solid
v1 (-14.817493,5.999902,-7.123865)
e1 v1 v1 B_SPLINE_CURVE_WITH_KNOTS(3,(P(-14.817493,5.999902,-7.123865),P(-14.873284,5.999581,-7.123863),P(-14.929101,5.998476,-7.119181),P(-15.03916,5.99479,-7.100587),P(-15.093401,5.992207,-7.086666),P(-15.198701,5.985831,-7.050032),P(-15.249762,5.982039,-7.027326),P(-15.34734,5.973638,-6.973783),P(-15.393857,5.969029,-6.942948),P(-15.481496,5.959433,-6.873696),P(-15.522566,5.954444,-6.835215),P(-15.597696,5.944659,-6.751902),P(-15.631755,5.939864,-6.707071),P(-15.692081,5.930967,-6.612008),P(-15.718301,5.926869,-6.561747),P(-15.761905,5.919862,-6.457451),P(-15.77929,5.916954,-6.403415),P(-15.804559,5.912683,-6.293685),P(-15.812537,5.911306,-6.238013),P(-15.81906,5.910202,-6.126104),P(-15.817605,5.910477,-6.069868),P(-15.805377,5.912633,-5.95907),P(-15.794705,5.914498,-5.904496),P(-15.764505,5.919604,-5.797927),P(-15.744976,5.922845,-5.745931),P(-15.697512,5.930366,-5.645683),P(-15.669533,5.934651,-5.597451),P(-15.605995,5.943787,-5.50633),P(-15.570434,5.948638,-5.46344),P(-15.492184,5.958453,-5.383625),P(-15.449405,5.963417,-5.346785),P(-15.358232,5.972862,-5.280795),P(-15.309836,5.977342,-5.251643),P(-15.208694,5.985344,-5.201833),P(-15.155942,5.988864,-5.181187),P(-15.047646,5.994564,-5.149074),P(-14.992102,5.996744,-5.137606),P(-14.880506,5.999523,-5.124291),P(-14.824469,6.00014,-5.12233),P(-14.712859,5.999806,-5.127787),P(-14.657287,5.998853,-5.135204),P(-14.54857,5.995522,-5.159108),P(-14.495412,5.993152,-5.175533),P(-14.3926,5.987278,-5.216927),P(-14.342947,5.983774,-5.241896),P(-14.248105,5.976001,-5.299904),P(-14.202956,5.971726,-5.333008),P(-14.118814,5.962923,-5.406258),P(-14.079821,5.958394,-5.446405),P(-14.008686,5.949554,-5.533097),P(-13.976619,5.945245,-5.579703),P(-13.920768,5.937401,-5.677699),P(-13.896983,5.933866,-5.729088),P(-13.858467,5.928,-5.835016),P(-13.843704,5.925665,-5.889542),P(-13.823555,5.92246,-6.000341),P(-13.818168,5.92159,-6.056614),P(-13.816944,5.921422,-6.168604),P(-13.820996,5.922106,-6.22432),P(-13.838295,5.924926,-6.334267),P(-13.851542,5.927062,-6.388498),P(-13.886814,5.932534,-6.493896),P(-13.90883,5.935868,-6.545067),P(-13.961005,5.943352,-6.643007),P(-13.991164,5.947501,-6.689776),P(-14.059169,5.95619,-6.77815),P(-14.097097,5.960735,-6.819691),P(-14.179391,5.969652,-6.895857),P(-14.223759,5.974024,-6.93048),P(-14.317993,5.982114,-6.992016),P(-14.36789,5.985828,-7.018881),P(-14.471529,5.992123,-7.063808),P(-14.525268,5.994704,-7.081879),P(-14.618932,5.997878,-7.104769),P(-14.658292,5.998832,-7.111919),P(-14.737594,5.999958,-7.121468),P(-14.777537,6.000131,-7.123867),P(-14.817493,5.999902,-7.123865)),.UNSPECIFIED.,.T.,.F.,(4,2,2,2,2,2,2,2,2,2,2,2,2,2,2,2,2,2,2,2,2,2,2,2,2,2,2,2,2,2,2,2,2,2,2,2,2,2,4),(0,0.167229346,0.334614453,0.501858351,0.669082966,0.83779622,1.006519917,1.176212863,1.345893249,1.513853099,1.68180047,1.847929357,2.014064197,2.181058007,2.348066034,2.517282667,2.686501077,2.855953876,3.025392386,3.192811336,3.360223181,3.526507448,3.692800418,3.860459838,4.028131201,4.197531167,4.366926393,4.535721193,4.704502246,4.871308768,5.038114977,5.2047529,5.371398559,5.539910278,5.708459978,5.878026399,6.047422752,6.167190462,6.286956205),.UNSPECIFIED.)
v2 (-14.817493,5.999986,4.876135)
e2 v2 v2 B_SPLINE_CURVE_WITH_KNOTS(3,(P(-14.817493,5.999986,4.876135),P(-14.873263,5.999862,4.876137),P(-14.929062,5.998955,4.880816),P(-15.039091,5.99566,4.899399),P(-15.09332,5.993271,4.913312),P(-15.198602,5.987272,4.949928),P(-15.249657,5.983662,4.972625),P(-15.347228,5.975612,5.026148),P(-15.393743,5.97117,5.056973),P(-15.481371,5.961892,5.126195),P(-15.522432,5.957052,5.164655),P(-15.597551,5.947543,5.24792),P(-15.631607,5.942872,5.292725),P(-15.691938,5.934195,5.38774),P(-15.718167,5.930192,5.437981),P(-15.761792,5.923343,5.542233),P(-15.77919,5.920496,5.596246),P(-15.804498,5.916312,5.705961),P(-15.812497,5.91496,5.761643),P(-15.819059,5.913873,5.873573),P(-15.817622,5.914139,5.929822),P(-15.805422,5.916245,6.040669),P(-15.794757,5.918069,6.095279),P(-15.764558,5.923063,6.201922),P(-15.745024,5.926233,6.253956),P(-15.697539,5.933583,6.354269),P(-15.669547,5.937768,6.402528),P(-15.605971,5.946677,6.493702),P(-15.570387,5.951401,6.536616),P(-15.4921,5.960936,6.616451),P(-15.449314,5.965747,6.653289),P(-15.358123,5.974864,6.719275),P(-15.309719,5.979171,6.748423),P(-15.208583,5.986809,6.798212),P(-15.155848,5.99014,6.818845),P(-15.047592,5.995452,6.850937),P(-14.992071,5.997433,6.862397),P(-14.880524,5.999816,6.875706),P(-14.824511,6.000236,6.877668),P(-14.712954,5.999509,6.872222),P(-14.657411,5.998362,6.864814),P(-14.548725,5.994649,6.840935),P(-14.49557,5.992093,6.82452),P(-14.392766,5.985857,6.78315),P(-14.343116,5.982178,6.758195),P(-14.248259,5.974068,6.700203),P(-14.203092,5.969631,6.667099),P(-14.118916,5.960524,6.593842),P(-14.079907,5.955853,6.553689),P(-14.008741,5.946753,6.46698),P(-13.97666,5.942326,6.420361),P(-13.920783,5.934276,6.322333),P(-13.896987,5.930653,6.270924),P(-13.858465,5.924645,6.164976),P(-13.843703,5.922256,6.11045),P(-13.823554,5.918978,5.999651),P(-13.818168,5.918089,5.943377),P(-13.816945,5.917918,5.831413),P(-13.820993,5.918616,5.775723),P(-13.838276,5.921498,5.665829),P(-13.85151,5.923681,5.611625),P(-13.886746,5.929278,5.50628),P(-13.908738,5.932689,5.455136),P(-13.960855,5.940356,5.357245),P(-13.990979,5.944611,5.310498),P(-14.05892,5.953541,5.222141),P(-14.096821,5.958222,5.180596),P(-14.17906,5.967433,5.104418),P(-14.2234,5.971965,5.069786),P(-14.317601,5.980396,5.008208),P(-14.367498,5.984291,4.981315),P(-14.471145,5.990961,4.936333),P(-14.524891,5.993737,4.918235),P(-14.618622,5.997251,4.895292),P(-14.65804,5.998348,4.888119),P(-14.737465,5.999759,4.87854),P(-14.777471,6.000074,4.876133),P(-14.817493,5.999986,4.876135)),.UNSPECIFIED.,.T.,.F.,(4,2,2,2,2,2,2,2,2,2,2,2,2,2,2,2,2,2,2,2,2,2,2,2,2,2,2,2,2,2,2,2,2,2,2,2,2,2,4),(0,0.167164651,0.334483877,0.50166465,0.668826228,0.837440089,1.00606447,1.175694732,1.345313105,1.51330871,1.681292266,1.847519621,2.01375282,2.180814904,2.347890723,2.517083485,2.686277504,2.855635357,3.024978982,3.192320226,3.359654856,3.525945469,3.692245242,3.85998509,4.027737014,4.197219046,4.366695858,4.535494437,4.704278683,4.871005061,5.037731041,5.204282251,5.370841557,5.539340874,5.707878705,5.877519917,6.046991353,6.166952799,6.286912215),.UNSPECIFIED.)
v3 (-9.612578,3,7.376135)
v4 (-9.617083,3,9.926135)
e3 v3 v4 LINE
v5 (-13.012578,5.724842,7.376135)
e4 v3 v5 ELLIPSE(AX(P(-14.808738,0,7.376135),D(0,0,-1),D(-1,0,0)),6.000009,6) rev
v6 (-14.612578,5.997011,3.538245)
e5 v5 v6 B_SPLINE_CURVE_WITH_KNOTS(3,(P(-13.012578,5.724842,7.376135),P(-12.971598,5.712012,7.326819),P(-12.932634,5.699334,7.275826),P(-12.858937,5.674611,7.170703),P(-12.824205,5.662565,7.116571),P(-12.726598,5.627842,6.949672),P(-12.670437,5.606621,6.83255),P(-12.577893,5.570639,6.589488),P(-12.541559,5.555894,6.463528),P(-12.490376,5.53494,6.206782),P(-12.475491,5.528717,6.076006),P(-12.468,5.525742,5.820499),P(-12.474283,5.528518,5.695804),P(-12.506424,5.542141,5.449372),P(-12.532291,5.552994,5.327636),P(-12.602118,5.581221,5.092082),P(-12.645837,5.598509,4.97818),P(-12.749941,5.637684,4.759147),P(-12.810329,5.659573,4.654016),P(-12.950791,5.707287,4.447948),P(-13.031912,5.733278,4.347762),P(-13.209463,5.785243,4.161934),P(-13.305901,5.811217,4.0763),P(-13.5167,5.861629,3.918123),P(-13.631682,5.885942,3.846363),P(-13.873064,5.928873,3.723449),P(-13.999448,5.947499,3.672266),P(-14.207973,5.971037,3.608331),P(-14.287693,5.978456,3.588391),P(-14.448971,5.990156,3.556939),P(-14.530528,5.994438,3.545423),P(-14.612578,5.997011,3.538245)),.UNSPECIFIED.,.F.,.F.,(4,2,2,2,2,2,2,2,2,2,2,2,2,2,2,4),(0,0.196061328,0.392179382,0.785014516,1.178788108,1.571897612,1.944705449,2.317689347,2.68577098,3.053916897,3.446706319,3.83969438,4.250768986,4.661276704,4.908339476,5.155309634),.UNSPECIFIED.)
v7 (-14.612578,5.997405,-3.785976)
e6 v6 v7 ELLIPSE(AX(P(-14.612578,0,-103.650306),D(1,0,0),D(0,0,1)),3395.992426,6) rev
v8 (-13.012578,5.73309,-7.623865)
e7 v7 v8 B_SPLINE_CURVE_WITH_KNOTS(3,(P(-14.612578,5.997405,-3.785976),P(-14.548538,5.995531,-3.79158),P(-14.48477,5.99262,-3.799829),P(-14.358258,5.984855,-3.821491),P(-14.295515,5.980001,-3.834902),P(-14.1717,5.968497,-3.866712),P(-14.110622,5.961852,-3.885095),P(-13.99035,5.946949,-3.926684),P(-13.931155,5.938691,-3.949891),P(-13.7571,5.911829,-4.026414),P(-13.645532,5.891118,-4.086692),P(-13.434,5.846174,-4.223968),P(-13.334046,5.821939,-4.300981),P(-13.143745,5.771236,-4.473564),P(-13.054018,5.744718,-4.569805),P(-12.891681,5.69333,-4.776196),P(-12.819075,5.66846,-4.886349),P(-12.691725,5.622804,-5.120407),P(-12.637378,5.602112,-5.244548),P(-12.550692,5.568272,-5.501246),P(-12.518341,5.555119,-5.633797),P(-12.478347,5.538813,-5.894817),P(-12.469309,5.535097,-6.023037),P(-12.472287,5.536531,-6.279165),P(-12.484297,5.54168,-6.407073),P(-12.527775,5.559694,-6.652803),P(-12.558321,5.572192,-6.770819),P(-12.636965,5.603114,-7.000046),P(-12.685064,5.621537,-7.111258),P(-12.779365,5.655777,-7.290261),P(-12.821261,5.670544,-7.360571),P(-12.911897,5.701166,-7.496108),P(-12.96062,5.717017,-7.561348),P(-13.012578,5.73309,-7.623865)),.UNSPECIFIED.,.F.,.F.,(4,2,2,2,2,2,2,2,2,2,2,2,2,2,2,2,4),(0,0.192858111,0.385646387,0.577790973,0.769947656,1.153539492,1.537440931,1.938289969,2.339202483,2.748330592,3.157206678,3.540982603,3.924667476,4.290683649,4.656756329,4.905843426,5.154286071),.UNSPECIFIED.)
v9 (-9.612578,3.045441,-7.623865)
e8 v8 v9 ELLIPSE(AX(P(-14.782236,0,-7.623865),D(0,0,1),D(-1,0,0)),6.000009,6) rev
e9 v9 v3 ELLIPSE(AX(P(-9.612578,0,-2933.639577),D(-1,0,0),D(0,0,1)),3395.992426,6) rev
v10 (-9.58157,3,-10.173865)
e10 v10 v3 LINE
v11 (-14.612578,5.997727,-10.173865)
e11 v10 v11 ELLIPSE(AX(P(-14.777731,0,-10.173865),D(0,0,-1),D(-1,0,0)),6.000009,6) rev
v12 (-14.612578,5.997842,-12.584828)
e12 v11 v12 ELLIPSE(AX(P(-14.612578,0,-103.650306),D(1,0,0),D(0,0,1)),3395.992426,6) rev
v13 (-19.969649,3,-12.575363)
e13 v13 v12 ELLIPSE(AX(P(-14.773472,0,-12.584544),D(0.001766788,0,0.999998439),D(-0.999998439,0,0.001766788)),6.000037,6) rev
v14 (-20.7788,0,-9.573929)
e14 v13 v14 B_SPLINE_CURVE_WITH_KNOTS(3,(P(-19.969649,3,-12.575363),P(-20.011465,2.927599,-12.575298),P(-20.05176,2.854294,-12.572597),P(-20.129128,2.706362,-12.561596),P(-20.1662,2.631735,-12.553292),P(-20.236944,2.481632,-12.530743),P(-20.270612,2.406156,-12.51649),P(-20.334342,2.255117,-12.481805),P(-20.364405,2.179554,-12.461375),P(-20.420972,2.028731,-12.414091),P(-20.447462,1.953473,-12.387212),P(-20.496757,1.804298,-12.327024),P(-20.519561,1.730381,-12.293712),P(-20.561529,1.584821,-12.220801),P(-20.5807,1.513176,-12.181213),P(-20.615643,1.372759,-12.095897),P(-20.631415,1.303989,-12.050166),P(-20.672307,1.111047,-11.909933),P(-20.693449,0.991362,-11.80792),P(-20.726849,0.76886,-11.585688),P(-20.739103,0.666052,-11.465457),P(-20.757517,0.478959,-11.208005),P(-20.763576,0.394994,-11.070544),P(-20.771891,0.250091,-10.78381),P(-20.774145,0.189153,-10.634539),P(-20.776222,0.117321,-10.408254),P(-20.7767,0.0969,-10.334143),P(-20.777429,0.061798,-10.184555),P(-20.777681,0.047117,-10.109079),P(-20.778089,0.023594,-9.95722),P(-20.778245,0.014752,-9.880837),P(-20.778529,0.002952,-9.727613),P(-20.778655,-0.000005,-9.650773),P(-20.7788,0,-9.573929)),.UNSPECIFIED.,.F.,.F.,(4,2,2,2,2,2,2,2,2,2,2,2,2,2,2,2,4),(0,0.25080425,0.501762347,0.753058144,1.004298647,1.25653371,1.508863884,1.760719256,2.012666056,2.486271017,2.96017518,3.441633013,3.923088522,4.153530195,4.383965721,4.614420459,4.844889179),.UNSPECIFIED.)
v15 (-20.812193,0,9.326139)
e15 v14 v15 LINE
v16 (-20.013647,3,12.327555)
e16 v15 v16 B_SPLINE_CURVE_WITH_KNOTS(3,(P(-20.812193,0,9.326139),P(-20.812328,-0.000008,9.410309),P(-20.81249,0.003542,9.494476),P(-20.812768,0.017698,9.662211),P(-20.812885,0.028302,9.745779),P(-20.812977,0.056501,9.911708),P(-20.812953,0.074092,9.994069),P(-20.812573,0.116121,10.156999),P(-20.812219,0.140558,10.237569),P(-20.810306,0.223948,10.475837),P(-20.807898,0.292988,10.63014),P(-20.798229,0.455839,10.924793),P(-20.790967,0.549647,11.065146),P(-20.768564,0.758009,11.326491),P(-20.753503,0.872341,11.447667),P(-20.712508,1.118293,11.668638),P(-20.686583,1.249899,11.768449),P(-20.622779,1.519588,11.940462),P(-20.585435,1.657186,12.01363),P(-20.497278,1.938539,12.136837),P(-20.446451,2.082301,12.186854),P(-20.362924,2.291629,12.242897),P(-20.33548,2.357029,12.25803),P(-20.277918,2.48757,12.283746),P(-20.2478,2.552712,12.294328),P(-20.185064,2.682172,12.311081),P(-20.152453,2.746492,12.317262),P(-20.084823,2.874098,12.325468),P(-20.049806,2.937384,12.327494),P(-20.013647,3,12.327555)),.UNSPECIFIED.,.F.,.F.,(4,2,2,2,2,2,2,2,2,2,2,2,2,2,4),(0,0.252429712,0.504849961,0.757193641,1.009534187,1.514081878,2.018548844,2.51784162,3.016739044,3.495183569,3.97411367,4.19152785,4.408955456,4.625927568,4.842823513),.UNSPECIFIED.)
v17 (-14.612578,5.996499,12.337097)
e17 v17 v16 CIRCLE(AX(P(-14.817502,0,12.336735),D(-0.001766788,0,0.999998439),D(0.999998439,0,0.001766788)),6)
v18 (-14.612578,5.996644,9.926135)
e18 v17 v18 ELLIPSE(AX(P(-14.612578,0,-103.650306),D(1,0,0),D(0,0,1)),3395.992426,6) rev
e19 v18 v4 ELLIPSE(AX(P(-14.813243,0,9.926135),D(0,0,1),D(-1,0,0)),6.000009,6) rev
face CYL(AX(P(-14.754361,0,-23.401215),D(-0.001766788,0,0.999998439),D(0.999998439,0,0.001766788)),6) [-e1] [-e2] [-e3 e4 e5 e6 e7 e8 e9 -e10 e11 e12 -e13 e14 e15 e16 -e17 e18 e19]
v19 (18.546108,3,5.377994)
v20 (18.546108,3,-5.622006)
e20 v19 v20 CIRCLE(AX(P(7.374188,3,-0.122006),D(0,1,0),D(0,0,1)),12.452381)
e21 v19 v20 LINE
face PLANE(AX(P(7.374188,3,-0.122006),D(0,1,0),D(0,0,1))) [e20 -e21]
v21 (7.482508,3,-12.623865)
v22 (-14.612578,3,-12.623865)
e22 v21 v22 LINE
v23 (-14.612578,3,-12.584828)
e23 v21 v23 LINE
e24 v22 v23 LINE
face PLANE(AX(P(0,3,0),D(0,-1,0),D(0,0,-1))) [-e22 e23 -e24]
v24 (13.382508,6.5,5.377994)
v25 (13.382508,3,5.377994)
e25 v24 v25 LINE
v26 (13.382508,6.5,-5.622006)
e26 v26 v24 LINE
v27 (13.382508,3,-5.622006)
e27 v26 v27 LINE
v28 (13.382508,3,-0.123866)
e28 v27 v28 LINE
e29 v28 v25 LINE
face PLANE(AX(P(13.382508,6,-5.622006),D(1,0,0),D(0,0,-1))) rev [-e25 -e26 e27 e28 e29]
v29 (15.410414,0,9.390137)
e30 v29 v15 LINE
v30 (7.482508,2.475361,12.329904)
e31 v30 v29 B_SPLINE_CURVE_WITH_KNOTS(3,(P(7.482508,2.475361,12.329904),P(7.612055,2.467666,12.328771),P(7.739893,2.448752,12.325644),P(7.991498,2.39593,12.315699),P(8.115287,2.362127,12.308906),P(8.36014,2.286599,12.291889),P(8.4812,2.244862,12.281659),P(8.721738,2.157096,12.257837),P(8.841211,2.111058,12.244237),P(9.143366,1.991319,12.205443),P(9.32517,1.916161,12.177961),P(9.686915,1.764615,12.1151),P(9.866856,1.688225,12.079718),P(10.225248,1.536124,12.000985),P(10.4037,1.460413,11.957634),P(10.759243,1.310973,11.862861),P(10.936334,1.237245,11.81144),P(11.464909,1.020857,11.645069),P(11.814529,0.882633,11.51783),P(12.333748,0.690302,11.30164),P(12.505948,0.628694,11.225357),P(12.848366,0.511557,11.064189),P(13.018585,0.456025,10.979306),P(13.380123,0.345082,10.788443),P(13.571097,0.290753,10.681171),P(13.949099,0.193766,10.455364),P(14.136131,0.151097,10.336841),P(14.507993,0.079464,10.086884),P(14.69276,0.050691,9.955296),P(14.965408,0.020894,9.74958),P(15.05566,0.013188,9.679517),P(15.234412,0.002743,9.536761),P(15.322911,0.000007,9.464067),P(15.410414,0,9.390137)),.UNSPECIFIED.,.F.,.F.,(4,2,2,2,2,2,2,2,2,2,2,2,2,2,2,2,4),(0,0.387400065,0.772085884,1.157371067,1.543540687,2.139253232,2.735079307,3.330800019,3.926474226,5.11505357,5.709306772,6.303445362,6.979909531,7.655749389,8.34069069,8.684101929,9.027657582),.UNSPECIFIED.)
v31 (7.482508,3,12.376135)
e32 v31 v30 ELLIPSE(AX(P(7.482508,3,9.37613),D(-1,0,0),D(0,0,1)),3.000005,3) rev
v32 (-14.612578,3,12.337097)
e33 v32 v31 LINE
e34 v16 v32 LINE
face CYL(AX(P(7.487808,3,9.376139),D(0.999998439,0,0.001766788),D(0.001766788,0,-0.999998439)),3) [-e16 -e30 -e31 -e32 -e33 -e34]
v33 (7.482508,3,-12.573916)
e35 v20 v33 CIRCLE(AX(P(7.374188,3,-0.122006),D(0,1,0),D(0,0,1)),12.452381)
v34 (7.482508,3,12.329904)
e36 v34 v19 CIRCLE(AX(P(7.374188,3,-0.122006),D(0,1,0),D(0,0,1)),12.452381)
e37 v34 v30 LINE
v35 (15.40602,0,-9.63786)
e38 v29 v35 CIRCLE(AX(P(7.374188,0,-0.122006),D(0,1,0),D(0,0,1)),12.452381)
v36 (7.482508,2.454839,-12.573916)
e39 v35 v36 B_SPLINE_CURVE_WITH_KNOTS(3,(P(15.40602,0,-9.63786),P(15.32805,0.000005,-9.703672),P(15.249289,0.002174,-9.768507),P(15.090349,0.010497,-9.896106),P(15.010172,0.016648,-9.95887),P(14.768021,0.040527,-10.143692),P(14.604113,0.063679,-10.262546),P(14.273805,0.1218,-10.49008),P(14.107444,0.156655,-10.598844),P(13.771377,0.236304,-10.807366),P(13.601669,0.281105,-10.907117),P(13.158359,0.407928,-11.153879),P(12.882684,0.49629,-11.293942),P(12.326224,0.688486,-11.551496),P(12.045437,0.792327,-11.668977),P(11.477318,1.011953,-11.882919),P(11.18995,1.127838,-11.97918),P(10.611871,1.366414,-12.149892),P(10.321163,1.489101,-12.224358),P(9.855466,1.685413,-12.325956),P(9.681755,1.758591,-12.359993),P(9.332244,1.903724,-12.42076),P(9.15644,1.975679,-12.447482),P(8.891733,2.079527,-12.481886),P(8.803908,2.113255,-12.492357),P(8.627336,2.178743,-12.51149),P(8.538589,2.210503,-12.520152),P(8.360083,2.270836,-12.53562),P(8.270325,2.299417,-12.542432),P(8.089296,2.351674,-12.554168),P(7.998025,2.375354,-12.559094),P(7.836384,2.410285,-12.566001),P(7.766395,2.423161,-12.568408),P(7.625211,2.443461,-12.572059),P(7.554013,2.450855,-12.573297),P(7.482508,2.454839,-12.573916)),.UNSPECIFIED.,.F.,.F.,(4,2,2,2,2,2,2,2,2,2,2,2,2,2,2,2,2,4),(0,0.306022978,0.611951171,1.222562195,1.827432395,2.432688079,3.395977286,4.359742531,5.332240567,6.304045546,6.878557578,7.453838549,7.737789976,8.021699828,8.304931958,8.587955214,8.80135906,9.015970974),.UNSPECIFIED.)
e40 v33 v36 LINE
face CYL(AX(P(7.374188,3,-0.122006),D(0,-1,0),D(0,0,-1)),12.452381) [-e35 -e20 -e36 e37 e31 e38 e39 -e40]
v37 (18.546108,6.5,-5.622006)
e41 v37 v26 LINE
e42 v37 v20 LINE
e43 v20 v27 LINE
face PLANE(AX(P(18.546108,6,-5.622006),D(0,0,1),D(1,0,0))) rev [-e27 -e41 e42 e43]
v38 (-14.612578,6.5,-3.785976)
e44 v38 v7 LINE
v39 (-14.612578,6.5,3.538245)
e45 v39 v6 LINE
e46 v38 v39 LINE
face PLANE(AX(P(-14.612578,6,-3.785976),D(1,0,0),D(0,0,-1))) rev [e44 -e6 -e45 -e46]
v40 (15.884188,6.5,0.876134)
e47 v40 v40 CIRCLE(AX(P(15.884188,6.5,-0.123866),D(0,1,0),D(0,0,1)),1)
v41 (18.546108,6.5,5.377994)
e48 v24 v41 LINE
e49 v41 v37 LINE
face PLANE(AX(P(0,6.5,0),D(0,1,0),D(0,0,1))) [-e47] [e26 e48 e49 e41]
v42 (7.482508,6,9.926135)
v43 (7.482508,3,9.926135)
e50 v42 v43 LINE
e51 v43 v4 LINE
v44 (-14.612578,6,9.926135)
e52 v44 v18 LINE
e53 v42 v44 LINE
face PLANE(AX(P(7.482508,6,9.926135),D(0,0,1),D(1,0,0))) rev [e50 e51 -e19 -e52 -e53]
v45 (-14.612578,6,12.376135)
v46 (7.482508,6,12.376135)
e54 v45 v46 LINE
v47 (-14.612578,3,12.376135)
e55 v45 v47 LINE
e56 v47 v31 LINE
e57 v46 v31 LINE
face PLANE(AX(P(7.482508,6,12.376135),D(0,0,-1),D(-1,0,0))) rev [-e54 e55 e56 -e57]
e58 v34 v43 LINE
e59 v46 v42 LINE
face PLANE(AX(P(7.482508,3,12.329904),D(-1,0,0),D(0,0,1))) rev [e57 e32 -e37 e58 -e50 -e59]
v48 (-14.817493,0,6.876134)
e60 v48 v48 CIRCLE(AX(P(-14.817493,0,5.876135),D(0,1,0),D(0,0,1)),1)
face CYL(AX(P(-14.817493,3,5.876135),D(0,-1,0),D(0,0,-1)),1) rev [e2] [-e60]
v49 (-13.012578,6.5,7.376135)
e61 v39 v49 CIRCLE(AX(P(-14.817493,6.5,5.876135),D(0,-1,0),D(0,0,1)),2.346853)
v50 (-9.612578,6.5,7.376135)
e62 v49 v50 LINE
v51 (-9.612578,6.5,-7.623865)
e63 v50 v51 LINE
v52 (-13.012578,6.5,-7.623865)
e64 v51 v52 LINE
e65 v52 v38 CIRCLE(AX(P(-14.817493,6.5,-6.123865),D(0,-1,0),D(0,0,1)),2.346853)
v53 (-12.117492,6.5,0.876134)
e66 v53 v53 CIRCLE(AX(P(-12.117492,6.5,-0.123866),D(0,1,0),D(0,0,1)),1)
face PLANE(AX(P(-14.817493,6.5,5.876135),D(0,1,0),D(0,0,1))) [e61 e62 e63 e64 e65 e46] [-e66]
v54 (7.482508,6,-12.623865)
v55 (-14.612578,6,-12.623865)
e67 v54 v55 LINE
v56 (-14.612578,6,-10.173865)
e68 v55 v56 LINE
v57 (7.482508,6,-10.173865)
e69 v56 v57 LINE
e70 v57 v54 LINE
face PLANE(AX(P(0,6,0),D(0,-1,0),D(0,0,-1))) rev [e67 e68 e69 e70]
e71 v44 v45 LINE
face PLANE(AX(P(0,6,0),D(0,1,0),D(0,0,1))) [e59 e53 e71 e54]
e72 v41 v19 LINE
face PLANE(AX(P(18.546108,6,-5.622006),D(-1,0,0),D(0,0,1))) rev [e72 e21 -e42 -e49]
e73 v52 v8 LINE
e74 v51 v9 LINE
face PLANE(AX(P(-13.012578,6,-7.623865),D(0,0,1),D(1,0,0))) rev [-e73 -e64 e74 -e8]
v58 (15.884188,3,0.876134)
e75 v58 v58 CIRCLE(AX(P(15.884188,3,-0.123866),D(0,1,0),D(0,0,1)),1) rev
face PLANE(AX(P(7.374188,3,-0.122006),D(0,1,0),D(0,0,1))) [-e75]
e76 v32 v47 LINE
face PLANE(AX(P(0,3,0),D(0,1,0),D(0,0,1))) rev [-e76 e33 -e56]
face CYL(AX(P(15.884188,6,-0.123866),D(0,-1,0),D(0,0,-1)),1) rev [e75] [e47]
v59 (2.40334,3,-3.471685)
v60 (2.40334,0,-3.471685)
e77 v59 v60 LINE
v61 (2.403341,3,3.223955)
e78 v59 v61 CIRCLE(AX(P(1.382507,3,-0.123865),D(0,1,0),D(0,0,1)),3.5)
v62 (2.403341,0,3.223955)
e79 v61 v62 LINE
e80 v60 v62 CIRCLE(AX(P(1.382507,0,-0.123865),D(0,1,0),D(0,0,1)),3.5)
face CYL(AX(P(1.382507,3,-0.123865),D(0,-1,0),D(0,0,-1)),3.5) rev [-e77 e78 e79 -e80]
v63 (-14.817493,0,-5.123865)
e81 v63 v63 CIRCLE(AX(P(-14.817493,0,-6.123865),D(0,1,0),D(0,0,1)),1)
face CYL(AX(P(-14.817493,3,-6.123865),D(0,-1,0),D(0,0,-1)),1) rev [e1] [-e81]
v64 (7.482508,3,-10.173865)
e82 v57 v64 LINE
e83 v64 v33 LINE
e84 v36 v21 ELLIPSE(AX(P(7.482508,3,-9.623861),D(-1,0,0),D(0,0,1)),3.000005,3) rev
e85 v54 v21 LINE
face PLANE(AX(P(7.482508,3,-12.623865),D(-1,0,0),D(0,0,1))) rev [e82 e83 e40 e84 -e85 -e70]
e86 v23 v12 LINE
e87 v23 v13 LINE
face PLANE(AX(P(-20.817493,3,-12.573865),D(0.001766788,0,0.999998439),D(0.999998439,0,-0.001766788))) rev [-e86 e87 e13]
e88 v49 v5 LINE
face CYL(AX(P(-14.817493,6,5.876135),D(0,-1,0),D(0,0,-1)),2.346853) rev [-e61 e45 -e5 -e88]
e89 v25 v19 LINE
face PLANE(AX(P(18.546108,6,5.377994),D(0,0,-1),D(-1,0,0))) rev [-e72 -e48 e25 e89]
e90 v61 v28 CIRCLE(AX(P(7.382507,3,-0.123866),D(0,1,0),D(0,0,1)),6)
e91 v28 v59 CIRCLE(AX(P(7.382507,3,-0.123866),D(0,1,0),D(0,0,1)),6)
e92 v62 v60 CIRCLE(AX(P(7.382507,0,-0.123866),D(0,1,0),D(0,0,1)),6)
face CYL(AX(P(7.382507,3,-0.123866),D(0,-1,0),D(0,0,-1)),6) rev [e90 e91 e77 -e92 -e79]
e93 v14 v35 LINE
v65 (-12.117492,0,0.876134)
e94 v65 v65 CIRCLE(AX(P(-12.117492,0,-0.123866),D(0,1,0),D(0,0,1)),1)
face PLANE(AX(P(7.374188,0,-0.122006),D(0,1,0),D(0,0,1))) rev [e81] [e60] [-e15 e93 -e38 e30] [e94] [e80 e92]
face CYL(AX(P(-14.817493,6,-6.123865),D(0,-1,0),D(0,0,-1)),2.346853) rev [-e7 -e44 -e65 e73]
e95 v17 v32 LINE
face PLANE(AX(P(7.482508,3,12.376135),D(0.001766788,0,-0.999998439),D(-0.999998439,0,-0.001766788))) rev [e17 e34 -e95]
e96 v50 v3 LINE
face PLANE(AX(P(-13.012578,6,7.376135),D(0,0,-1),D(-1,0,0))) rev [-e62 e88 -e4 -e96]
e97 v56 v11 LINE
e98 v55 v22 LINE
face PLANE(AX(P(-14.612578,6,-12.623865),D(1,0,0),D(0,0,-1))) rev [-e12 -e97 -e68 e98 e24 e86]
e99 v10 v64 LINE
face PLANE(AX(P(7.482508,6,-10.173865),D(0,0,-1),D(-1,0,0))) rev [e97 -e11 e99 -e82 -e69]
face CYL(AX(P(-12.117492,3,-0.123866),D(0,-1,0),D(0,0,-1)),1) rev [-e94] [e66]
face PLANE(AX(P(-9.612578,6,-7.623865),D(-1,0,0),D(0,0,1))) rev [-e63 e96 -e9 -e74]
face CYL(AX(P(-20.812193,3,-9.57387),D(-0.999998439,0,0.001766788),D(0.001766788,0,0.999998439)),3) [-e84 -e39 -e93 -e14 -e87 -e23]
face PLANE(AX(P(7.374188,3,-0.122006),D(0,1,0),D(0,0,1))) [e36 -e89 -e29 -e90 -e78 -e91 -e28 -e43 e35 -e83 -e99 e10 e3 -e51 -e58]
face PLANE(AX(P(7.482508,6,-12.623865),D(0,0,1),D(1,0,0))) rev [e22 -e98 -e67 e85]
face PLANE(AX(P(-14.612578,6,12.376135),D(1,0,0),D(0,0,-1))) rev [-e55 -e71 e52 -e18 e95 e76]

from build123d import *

# Parameters (mm, degrees)
CROQUIS1_R              = 1.00000007
CROQUIS1_R_2            = 1.000000043
CROQUIS1_R_3            = 0.999999659
SALIENTE_EXTRUIR1_DEPTH = 3
SALIENTE_EXTRUIR2_REACH = 34.647
CROQUIS3_W              = 22.095085155
CROQUIS3_H              = 2.45
CROQUIS3_W_2            = 5.163600355
CROQUIS3_H_2            = 11
CROQUIS3_R              = 1
SALIENTE_EXTRUIR3_DEPTH = 3
CROQUIS4_W              = 5.163600355
CROQUIS4_H              = 11
CROQUIS4_R              = 1
SALIENTE_EXTRUIR4_DEPTH = 0.5
CORTAR_EXTRUIR1_DEPTH   = 30.5
CROQUIS6_R              = 1.000000043
CROQUIS6_R_2            = 1.00000007
CROQUIS6_R_3            = 0.999999659
CORTAR_EXTRUIR2_DEPTH   = 30.5
REDONDEO1_R             = 3


with BuildPart() as part:
    # Croquis1 → Saliente-Extruir1 (new body)
    with BuildSketch(Plane(origin=(0, 0, 0), x_dir=(1, 0, 0), z_dir=(0, 1, 0))):
        with BuildLine():
            Line((-20.817493094, 12.573865304), (7.482507574, 12.623865495))
            Line((7.482507574, 12.623865495), (7.482507574, 12.573916185))
            ThreePointArc((7.482507574, 12.573916185), (19.826569133, 0.122006117), (7.482507574, -12.329903951))
            Line((7.482507574, -12.329903951), (7.482507574, -12.376134505))
            Line((7.482507574, -12.376134505), (-20.817493094, -12.326134314))
            Line((-20.817493094, -12.326134314), (-20.817493094, 12.573865304))
        make_face()
        with Locations(Location((-12.11749246, 0.123865663, 0), (0, 0, 270))):
            Circle(CROQUIS1_R, mode=Mode.SUBTRACT)
        with Locations(Location((-14.817492891, 6.123865452, 0), (0, 0, 270))):
            Circle(CROQUIS1_R_2, mode=Mode.SUBTRACT)
        with Locations(Location((-14.817492524, -5.876134505, 0), (0, 0, 270))):
            Circle(CROQUIS1_R_3, mode=Mode.SUBTRACT)
        with BuildLine():
            ThreePointArc((2.403340998, -3.223954765), (13.382507625, 0.123866695), (2.403340083, 3.471685154))
            ThreePointArc((2.403340083, 3.471685154), (-2.117492981, 0.123864576), (2.403340998, -3.223954765))
        make_face(mode=Mode.SUBTRACT)
    extrude(amount=SALIENTE_EXTRUIR1_DEPTH)

    # Saliente-Extruir2: up to this plane
    saliente_extruir2_end = Plane(origin=(-20.817493094, 3, -12.573865304), z_dir=(0.001766788392819182, 0, 0.9999984392281696))
    # Croquis2 → Saliente-Extruir2 (add, up to the surface)
    with BuildSketch(Plane(origin=(-0.02184262, 0, 12.362875885), x_dir=(0.9999984392281696, 0, 0.001766788392856574), z_dir=(-0.001766788392856574, 0, 0.9999984392281696)), mode=Mode.PRIVATE) as saliente_extruir2_sk1:
        with BuildLine():
            Line((-9.599530509, 3), (-19.991835354, 3))
            ThreePointArc((-19.991835354, 3), (-14.795682931, 6), (-9.599530509, 3))
        make_face()
    saliente_extruir2_tool1 = split(extrude(saliente_extruir2_sk1.sketch, amount=-SALIENTE_EXTRUIR2_REACH, mode=Mode.PRIVATE), bisect_by=saliente_extruir2_end, keep=Keep.BOTH, mode=Mode.PRIVATE)
    add(saliente_extruir2_tool1.solids().sort_by_distance((-14.817502, 4.230121, 12.336735))[0])

    # Croquis3 → Saliente-Extruir3 (add)
    # profile 1 of 4: a face of its own
    with BuildSketch(Plane(origin=(0, 3, 0), x_dir=(1, 0, 0), z_dir=(0, 1, 0))):
        with Locations((-3.565035003, -11.151134505)):
            Rectangle(CROQUIS3_W, CROQUIS3_H)
    # profile 2 of 4: a face of its own
    with BuildSketch(Plane(origin=(0, 3, 0), x_dir=(1, 0, 0), z_dir=(0, 1, 0))):
        with Locations((-3.565035003, 11.398865495)):
            Rectangle(CROQUIS3_W, CROQUIS3_H)
    # profile 3 of 4: a face of its own
    with BuildSketch(Plane(origin=(0, 3, 0), x_dir=(1, 0, 0), z_dir=(0, 1, 0))):
        with BuildLine():
            Line((-13.012577984, 7.623865495), (-9.612577581, 7.623865495))
            Line((-9.612577581, 7.623865495), (-9.612577581, -7.376134505))
            Line((-9.612577581, -7.376134505), (-13.012577581, -7.376134505))
            ThreePointArc((-13.012577581, -7.376134505), (-12.651343128, -4.973075952), (-14.612577581, -3.538244886))
            Line((-14.612577581, -3.538244886), (-14.612577581, 3.785975877))
            ThreePointArc((-14.612577581, 3.785975877), (-12.651343414, 5.220807096), (-13.012577984, 7.623865495))
        make_face()
    # profile 4 of 4: a face of its own
    with BuildSketch(Plane(origin=(0, 3, 0), x_dir=(1, 0, 0), z_dir=(0, 1, 0))):
        with Locations((15.964307803, 0.122006117)):
            Rectangle(CROQUIS3_W_2, CROQUIS3_H_2)
        with Locations(Location((15.884187935, 0.123865875, 0), (0, 0, 270))):
            Circle(CROQUIS3_R, mode=Mode.SUBTRACT)
    extrude(amount=SALIENTE_EXTRUIR3_DEPTH)

    # Croquis4 → Saliente-Extruir4 (add)
    # profile 1 of 2: a face of its own
    with BuildSketch(Plane(origin=(0, 6, 0), x_dir=(1, 0, 0), z_dir=(0, 1, 0))):
        with Locations((15.964307803, 0.122006117)):
            Rectangle(CROQUIS4_W, CROQUIS4_H)
        with Locations(Location((15.884187935, 0.123865875, 0), (0, 0, 270))):
            Circle(CROQUIS4_R, mode=Mode.SUBTRACT)
    # profile 2 of 2: a face of its own
    with BuildSketch(Plane(origin=(0, 6, 0), x_dir=(1, 0, 0), z_dir=(0, 1, 0))):
        with BuildLine():
            Line((-13.012577576, -7.376134508), (-9.612577581, -7.376134505))
            Line((-9.612577581, -7.376134505), (-9.612577581, 7.623865495))
            Line((-9.612577581, 7.623865495), (-13.012577984, 7.623865495))
            ThreePointArc((-13.012577984, 7.623865495), (-12.651343414, 5.220807096), (-14.612577581, 3.785975877))
            Line((-14.612577581, 3.785975877), (-14.612577581, -3.538244892))
            ThreePointArc((-14.612577581, -3.538244892), (-12.651343124, -4.97307595), (-13.012577576, -7.376134508))
        make_face()
    extrude(amount=SALIENTE_EXTRUIR4_DEPTH)

    # Croquis5 → Cortar-Extruir1 (cut)
    with BuildSketch(Plane(origin=(-0.02184262, 0, 12.362875885), x_dir=(0.9999984392281696, 0, 0.001766788392856574), z_dir=(-0.001766788392856574, 0, 0.9999984392281696))):
        with BuildLine():
            ThreePointArc((-19.991835354, 3), (-17.725768159, 5.235895392), (-14.634858473, 5.997844237))
            Line((-14.634858473, 5.997844237), (-14.634858473, 8.229597487))
            ThreePointArc((-14.634858473, 8.229597487), (-20.558857666, 5.876900228), (-23.026851701, 0))
            Line((-23.026851701, 0), (-20.795682931, 0))
            Line((-20.795682931, 0), (-20.795682931, 3))
            Line((-20.795682931, 3), (-19.991835354, 3))
        make_face()
        with BuildLine():
            ThreePointArc((-20.795682931, 0), (-20.591237889, 1.552914271), (-19.991835354, 3))
            Line((-19.991835354, 3), (-20.795682931, 3))
            Line((-20.795682931, 3), (-20.795682931, 0))
        make_face()
    extrude(amount=-CORTAR_EXTRUIR1_DEPTH, mode=Mode.SUBTRACT)

    # Croquis6 → Cortar-Extruir2 (cut)
    with BuildSketch(Plane.XZ):
        with Locations(Location((-14.817492891, -6.123865452, 0), (0, 0, 270))):
            Circle(CROQUIS6_R)
        with Locations(Location((-12.11749246, -0.123865663, 0), (0, 0, 90))):
            Circle(CROQUIS6_R_2)
        with Locations(Location((-14.817492524, 5.876134505, 0), (0, 0, 270))):
            Circle(CROQUIS6_R_3)
    extrude(amount=-CORTAR_EXTRUIR2_DEPTH, mode=Mode.SUBTRACT)

    # Redondeo1
    redondeo1_edges = [part.edges().sort_by_distance(p)[0] for p in [
        (-6.645496142, 0, -12.598904263),
        (-6.66749276, 0, 12.35113441),
    ]]
    fillet(redondeo1_edges, radius=REDONDEO1_R - 0.0001)  # a hair under: the kernel refuses the full size


solid = part.part
